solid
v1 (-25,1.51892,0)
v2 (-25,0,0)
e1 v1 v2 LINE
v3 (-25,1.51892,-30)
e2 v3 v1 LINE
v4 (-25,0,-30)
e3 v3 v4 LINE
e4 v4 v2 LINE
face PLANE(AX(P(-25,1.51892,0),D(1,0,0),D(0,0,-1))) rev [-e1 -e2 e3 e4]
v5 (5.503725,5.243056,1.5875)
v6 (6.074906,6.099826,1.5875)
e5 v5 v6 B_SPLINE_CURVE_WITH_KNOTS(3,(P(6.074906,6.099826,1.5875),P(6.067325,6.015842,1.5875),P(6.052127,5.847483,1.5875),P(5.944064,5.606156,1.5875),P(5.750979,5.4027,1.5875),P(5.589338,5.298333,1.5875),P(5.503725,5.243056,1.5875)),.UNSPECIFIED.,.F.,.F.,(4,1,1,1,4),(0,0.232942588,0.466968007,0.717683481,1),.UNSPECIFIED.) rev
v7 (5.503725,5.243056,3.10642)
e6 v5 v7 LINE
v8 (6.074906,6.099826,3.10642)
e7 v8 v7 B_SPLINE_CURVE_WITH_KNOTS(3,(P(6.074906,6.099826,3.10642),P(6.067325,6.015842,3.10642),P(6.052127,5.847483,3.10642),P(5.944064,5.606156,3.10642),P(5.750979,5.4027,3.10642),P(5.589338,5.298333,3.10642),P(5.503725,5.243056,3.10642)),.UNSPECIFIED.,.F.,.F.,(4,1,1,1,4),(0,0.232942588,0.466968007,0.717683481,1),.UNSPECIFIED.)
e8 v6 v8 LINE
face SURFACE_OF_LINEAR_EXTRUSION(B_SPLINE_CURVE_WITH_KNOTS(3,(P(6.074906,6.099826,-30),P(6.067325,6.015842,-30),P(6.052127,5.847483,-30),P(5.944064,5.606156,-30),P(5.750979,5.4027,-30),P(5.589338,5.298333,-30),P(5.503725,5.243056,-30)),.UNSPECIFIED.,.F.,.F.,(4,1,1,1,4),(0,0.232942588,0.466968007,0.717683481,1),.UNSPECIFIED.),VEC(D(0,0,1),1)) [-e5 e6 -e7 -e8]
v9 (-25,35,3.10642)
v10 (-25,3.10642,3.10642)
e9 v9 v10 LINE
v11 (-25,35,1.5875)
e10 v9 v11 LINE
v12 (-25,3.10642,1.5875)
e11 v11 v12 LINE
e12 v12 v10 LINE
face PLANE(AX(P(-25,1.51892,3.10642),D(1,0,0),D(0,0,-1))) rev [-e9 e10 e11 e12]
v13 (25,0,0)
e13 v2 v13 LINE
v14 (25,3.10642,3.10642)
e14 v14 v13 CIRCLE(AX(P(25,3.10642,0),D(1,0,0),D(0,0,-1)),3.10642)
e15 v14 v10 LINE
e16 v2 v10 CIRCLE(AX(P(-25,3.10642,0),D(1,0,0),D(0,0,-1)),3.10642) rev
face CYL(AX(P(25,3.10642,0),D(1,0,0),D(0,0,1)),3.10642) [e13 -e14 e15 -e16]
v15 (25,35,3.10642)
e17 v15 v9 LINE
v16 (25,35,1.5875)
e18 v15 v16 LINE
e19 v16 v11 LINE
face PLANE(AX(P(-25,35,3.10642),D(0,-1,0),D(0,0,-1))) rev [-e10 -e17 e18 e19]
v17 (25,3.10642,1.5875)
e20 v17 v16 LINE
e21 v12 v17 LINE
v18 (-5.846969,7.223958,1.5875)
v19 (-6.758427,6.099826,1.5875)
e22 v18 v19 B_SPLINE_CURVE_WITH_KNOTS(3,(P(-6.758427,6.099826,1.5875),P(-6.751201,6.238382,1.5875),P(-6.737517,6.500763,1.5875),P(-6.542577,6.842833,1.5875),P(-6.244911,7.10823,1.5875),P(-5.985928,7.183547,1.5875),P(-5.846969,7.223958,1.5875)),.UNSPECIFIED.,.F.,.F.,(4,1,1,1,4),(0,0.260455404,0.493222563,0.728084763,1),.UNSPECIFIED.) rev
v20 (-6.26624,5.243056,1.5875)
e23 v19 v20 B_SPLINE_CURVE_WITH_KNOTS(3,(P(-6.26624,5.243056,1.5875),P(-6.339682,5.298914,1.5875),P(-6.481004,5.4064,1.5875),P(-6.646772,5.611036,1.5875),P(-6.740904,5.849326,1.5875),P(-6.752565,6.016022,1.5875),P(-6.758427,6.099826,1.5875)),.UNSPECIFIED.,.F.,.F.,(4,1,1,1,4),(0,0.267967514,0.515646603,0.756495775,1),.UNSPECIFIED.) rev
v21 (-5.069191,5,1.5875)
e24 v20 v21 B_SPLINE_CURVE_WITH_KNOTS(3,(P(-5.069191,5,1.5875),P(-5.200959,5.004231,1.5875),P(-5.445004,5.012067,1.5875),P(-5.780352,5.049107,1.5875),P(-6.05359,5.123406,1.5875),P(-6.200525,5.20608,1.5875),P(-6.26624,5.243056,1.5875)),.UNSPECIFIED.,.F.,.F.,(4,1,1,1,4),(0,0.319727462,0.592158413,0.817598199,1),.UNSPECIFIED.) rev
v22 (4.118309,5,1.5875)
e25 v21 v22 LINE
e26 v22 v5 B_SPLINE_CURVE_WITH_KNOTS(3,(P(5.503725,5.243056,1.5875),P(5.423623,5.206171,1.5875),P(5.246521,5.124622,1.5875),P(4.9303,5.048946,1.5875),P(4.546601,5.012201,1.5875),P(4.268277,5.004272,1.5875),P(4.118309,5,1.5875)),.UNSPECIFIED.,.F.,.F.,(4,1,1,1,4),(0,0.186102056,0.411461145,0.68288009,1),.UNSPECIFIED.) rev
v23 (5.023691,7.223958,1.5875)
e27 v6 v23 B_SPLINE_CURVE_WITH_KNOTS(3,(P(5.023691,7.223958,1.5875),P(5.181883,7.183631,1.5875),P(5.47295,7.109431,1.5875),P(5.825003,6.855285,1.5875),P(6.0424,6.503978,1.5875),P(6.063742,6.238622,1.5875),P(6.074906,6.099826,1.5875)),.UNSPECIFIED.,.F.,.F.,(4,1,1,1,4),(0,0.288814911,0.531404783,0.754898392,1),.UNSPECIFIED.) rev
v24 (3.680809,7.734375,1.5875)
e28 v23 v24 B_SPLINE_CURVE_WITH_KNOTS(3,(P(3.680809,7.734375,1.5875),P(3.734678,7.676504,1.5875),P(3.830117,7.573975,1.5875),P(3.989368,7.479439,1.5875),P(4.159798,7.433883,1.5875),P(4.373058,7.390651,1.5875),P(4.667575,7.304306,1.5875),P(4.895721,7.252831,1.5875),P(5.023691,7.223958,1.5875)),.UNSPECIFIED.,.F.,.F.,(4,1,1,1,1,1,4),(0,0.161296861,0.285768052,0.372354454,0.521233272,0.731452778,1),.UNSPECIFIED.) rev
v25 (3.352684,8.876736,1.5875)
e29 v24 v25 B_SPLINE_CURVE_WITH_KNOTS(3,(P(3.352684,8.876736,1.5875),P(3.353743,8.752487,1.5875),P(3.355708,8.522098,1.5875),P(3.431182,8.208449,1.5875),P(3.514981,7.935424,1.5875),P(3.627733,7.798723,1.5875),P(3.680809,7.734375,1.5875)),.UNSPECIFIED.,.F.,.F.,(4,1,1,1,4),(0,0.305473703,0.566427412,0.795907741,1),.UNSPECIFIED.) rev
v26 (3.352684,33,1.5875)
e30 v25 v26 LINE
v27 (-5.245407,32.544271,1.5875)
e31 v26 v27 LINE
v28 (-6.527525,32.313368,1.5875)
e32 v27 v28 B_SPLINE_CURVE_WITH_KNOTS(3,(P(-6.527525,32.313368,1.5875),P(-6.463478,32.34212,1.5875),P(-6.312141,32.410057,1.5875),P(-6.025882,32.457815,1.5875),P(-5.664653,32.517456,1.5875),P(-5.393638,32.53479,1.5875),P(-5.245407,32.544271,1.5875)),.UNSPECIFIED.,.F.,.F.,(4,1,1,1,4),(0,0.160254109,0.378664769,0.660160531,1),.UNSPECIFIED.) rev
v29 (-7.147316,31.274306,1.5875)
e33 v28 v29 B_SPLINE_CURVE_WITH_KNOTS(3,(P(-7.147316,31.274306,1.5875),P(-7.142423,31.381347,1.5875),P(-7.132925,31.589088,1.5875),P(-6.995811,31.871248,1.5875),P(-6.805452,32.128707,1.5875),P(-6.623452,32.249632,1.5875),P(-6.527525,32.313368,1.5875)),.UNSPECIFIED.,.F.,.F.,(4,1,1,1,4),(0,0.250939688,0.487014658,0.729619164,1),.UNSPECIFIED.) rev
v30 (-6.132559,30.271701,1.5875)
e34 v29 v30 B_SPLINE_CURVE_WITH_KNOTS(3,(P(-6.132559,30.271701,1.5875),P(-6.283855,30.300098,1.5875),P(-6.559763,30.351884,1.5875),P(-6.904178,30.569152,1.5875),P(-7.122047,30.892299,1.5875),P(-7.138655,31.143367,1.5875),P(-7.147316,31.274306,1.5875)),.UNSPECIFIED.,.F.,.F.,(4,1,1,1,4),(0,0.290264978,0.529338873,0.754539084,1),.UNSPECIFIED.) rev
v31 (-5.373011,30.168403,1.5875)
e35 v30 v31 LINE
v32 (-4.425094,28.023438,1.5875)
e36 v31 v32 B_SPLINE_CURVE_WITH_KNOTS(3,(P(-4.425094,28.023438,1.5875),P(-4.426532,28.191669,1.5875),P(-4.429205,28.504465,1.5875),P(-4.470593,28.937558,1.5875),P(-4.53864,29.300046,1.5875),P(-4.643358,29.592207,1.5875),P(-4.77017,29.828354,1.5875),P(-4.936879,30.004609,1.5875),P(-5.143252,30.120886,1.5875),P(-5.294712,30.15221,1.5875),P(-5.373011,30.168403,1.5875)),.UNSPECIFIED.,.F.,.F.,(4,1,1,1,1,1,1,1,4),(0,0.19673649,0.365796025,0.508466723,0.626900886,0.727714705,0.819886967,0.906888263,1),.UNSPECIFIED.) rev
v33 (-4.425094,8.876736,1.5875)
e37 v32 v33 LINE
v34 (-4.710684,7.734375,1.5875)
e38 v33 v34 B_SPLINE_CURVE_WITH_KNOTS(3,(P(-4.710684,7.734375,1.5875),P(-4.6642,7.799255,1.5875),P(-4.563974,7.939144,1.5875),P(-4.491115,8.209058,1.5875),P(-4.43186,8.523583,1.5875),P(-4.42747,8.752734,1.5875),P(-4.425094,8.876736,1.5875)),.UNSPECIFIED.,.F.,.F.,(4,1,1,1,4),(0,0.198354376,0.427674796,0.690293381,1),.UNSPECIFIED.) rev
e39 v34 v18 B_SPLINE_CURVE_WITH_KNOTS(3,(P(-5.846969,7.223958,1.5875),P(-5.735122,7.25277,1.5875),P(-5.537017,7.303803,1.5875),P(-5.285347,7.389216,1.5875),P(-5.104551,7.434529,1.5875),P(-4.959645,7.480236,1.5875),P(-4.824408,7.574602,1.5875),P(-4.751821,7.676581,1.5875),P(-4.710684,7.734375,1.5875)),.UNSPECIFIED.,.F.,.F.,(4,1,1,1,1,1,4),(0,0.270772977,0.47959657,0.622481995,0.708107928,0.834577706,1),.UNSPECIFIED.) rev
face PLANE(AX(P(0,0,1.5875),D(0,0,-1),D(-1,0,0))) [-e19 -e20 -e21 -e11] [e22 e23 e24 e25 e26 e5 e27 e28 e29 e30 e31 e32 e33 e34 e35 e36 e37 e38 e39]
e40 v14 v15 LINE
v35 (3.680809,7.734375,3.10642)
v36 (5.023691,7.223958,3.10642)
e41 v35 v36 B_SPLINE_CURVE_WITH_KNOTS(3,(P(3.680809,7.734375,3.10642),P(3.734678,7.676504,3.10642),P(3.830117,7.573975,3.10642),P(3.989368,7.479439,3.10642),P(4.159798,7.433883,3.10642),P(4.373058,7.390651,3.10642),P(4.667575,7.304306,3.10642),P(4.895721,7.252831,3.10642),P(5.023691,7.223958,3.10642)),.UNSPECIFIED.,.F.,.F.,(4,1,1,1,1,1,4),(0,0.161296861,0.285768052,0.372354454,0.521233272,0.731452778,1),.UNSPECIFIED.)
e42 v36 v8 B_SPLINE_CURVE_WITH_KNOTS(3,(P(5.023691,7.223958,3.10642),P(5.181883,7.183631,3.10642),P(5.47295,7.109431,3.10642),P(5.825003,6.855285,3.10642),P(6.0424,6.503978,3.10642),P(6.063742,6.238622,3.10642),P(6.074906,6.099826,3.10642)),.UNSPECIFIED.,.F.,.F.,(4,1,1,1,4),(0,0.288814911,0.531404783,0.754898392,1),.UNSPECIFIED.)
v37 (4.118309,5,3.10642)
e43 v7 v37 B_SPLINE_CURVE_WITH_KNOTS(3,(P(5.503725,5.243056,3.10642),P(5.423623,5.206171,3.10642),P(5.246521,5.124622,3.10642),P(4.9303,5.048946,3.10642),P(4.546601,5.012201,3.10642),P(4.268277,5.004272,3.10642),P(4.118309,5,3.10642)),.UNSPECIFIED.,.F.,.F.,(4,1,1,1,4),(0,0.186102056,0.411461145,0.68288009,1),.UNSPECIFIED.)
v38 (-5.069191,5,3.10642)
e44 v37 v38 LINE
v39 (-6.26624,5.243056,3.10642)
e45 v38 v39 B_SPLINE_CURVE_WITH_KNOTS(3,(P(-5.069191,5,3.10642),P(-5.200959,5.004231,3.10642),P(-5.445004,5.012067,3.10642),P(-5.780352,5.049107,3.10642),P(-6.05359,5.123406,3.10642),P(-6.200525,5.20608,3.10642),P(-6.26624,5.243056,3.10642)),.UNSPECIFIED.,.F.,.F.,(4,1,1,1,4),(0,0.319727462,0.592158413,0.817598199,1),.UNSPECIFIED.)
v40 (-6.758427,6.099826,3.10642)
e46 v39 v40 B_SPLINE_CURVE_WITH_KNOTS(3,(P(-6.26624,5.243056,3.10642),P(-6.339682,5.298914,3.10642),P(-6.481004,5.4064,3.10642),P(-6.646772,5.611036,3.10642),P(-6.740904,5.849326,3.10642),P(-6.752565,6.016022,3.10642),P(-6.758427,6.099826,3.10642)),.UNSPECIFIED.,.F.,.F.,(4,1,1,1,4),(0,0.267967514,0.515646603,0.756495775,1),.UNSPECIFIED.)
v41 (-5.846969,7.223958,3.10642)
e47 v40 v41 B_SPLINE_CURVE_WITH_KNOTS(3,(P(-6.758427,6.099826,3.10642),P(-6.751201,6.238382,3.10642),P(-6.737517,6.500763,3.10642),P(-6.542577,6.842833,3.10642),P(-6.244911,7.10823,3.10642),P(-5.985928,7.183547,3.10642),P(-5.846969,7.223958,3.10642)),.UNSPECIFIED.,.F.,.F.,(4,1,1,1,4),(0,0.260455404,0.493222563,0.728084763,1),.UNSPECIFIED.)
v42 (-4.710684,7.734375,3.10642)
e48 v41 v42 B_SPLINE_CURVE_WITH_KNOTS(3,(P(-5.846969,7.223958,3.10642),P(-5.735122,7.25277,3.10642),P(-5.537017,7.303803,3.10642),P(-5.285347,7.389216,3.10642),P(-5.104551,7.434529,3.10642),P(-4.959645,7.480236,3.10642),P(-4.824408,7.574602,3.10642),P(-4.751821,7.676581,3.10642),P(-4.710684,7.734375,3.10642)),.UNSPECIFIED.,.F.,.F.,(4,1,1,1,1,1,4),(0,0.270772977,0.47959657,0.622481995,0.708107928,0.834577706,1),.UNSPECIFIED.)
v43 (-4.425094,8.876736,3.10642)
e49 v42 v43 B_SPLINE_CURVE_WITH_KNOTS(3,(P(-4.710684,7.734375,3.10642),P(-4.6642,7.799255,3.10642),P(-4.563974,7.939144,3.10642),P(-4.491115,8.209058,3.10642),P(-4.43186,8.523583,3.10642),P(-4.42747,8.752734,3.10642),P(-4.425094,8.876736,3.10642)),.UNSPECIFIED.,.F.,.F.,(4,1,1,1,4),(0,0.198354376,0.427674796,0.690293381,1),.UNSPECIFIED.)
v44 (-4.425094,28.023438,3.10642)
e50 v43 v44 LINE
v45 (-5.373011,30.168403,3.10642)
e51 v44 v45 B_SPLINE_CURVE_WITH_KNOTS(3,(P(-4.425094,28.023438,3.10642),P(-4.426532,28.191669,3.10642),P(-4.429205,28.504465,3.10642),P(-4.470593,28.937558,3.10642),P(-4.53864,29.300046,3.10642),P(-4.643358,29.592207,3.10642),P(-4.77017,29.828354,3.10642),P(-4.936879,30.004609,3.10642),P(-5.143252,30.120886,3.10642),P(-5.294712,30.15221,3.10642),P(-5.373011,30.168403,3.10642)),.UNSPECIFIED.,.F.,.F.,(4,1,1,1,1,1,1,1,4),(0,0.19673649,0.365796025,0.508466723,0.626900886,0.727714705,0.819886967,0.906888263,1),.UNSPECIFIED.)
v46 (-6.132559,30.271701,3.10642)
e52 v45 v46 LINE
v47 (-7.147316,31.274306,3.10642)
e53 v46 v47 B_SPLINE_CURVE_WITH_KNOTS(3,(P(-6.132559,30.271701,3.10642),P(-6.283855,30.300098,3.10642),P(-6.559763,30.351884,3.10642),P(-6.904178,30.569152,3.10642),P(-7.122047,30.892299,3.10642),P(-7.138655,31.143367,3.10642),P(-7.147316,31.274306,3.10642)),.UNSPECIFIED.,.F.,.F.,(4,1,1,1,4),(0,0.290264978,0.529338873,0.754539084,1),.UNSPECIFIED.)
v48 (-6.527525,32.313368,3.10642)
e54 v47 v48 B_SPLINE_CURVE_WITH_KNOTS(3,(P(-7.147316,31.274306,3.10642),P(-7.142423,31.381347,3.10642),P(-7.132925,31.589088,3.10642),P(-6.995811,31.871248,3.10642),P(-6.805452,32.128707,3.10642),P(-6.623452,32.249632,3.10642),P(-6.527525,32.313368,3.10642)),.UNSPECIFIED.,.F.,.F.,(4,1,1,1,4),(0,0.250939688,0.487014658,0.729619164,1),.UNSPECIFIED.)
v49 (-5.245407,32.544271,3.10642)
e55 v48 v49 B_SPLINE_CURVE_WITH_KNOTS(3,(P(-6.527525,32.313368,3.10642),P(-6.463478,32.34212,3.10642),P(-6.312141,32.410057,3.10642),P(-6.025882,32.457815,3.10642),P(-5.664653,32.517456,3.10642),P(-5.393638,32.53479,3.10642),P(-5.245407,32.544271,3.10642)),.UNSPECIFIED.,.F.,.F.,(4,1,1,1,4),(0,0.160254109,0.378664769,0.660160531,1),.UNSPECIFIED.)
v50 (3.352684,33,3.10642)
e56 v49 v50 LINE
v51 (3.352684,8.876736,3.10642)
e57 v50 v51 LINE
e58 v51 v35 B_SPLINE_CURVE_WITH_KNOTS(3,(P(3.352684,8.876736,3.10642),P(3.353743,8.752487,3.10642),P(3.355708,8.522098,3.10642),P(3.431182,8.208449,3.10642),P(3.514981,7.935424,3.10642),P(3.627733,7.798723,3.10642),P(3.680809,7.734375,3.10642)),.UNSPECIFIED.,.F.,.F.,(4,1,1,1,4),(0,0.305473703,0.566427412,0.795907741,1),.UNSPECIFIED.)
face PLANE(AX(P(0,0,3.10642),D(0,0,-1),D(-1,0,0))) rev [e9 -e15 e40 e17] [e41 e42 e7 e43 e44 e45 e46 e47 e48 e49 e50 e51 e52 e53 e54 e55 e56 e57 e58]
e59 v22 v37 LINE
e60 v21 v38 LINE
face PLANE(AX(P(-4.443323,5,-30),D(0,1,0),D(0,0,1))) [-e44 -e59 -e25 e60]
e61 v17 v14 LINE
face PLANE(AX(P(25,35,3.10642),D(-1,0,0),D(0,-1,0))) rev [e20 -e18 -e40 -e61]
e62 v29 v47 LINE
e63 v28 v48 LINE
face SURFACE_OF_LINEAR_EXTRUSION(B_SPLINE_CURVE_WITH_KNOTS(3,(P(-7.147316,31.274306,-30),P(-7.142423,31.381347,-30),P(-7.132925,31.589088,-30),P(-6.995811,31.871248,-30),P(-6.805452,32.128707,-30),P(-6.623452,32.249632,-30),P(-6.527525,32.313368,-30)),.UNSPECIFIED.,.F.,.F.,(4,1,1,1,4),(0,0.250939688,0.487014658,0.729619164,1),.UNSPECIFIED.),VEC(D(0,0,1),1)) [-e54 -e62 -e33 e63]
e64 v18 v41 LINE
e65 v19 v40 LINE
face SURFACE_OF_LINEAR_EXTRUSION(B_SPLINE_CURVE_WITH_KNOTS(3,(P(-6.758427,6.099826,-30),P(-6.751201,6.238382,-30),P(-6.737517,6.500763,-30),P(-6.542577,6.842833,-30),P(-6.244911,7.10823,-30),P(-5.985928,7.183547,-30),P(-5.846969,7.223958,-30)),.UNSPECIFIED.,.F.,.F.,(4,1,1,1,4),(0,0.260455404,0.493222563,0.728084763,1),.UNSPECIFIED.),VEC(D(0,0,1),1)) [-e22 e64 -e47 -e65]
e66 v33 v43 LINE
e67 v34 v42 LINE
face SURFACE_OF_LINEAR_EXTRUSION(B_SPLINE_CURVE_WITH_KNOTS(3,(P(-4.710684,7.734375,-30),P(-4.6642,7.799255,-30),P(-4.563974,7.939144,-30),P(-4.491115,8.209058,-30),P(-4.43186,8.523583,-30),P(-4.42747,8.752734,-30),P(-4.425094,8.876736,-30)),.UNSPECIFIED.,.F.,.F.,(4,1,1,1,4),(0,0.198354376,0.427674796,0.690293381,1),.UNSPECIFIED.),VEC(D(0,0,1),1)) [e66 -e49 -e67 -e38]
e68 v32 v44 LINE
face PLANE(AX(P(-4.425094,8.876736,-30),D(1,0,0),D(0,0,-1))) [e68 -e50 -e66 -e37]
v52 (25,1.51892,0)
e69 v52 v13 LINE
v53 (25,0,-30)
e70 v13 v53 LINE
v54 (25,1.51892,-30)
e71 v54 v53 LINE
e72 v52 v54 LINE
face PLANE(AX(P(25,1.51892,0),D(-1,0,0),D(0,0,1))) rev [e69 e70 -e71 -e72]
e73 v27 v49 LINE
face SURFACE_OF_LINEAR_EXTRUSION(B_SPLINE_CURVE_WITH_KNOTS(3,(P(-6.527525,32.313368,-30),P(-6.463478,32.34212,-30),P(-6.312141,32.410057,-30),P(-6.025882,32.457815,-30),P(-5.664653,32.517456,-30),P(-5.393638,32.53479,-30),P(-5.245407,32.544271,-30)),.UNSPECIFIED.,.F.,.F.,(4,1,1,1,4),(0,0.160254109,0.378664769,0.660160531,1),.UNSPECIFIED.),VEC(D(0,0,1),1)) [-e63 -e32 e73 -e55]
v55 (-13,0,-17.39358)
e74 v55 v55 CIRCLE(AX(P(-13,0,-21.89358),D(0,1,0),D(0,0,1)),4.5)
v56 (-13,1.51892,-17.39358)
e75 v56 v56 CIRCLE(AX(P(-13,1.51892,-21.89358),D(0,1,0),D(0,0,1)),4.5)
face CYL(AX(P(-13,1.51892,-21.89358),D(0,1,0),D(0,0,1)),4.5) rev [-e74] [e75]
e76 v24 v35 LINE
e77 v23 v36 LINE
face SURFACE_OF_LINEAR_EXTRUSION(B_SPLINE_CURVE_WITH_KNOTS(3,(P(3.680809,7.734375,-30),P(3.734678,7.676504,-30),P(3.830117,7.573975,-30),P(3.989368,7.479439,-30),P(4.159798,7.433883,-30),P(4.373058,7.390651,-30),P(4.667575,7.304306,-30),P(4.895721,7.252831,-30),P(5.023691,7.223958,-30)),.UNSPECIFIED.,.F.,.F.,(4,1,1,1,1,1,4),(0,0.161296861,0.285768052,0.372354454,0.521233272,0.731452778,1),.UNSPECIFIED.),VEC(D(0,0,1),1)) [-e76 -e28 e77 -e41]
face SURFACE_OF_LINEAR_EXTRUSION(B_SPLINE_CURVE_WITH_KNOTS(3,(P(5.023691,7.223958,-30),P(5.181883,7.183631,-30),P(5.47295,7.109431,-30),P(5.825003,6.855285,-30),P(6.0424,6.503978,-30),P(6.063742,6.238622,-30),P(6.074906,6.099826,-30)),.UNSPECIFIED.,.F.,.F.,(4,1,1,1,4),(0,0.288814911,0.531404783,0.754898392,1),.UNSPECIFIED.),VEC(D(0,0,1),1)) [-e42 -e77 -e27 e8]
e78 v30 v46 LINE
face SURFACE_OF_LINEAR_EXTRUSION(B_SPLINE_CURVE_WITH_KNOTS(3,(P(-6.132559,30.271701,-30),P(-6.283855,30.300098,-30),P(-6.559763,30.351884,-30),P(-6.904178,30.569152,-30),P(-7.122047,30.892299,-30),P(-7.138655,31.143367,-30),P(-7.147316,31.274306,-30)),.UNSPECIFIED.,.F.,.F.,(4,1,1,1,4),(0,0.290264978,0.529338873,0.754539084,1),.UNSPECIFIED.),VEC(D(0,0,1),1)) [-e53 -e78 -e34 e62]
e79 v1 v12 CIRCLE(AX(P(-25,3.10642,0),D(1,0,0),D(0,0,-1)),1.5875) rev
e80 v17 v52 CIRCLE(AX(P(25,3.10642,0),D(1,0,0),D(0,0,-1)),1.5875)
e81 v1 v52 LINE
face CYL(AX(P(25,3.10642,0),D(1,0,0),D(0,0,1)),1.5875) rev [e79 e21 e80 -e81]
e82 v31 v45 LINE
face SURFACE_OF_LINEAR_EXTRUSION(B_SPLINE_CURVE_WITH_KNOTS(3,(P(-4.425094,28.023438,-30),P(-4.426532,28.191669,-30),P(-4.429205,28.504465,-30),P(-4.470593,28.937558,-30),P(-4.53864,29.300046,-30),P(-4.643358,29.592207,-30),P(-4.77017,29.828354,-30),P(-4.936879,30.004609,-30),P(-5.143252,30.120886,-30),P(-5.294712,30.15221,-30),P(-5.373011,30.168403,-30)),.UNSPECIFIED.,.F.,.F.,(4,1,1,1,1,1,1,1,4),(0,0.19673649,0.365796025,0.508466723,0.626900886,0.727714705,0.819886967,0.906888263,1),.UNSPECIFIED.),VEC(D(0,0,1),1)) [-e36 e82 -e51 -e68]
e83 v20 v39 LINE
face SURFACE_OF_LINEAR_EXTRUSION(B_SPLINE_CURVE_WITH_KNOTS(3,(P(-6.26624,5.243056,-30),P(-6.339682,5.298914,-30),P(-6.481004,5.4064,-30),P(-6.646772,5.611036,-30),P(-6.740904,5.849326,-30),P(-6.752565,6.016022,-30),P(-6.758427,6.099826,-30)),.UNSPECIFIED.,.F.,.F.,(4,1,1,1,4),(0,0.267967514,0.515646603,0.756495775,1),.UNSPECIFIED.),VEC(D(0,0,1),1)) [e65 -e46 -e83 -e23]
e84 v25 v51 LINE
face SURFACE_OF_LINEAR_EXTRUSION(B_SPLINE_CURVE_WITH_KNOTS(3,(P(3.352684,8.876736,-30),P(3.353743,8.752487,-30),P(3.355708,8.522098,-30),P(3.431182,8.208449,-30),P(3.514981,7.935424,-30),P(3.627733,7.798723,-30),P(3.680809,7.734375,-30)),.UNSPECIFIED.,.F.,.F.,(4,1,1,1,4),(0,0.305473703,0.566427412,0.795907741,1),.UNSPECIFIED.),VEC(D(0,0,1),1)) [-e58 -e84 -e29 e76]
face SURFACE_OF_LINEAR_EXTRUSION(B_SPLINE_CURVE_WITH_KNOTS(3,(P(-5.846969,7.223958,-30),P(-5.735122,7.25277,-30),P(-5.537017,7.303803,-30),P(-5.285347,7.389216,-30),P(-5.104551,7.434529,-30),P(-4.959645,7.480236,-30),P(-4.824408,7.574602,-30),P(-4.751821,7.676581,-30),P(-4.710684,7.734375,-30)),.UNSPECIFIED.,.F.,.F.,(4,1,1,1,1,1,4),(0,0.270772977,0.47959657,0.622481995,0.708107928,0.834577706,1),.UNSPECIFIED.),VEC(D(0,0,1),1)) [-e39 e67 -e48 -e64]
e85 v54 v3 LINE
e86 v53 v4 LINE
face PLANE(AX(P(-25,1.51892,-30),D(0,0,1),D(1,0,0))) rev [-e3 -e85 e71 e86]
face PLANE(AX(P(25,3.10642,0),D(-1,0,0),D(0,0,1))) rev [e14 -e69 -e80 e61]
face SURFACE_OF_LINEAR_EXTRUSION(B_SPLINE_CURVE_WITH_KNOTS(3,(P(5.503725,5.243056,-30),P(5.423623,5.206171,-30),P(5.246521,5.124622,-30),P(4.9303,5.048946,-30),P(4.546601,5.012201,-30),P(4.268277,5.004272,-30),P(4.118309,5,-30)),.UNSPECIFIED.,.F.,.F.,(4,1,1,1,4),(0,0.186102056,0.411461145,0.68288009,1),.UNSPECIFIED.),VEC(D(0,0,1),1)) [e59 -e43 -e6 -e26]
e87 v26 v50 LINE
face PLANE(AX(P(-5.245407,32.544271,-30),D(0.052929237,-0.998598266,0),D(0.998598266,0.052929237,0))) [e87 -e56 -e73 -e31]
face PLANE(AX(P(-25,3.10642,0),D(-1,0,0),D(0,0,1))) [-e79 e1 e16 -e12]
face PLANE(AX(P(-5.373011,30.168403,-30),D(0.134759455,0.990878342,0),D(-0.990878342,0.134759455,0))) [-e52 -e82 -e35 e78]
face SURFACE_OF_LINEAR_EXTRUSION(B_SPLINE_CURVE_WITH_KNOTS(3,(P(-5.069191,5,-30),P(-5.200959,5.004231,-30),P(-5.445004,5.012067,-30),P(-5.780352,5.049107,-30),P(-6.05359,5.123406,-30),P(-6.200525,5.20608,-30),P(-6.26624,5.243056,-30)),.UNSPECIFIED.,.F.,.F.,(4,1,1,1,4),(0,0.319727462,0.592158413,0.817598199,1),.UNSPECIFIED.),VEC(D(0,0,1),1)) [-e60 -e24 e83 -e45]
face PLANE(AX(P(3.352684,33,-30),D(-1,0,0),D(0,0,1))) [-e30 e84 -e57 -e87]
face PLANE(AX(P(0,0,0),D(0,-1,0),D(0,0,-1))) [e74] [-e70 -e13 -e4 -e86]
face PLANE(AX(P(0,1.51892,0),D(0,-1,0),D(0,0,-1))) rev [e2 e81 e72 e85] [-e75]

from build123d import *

# Parameters (mm, degrees)
SKETCH1_W            = 50
SKETCH1_H            = 30
BASE_FLANGE1_DEPTH   = 1.51892
EDGE_FLANGE1_DEPTH   = 50
M8_CLEARANCE_HOLE1_D = 9
CUT_EXTRUDE1_DEPTH   = 55.277389816


# Sheet-metal steps are written as plain solids
with BuildPart() as part:
    # Sketch1 → Base-Flange1 (new body)
    with BuildSketch(Plane(origin=(0, 0, 0), x_dir=(1, 0, 0), z_dir=(0, 1, 0))):
        with Locations((0, 15)):
            Rectangle(SKETCH1_W, SKETCH1_H)
    extrude(amount=BASE_FLANGE1_DEPTH)

    # Edge-Flange1 section (across the edge) → Edge-Flange1 (add)
    with BuildSketch(Plane(origin=(-25, 1.51892, 1.5875), x_dir=(0, 0, -1), z_dir=(1, 0, 0))):
        with BuildLine():
            Line((-1.51892, 1.5875), (-1.51892, 33.48108))
            Line((-1.51892, 33.48108), (0, 33.48108))
            Line((0, 33.48108), (0, 1.5875))
            ThreePointArc((0, 1.5875), (0.464967985, 0.464967985), (1.5875, 0))
            Line((1.5875, 0), (1.5875, -1.51892))
            ThreePointArc((1.5875, -1.51892), (-0.609070647, -0.609070647), (-1.51892, 1.5875))
        make_face()
    extrude(amount=EDGE_FLANGE1_DEPTH)

    # M8 Clearance Hole1 (through all)
    with Locations(Plane(origin=(0, 1.51892, 0), x_dir=(1, 0, 0), z_dir=(0, 1, 0))):
        with Locations((-13, 21.89358)):
            Hole(M8_CLEARANCE_HOLE1_D / 2)

    # Sketch11 → Cut-Extrude1 (cut, through all)
    with BuildSketch(Plane.XY.offset(3.10642)):
        with BuildLine():
            Line((3.352683653, 33), (3.352683653, 8.876736111))
            add(Edge.make_bspline(
                [(3.352683653, 8.876736111), (3.353743072, 8.75248746), (3.355707508, 8.522098259), (3.431182496, 8.208449128), (3.514980812, 7.935424237), (3.62773347, 7.798723212), (3.680808653, 7.734375)],
                knots=[0, 0, 0, 0, 1.221894812, 2.265709648, 3.183630964, 4, 4, 4, 4], degree=3))
            add(Edge.make_bspline(
                [(3.680808653, 7.734375), (3.734677776, 7.676504164), (3.830117167, 7.573974975), (3.989367782, 7.479439012), (4.159797664, 7.433882679), (4.373058128, 7.390651398), (4.667575389, 7.304305676), (4.895720619, 7.252831146), (5.023690598, 7.223958333)],
                knots=[0, 0, 0, 0, 0.967781164, 1.714608312, 2.234126727, 3.127399629, 4.388716669, 6, 6, 6, 6], degree=3))
            add(Edge.make_bspline(
                [(5.023690598, 7.223958333), (5.181883466, 7.183631094), (5.472950316, 7.109431018), (5.825003123, 6.855284919), (6.042399674, 6.503977916), (6.06374242, 6.238622284), (6.074905875, 6.099826389)],
                knots=[0, 0, 0, 0, 1.155259645, 2.125619132, 3.019593567, 4, 4, 4, 4], degree=3))
            add(Edge.make_bspline(
                [(6.074905875, 6.099826389), (6.06732471, 6.015842007), (6.052127137, 5.847482842), (5.944064224, 5.60615586), (5.75097894, 5.402699673), (5.589337522, 5.298332742), (5.50372532, 5.243055556)],
                knots=[0, 0, 0, 0, 0.931770353, 1.867872026, 2.870733925, 4, 4, 4, 4], degree=3))
            add(Edge.make_bspline(
                [(5.50372532, 5.243055556), (5.423622762, 5.206171118), (5.246520526, 5.124621709), (4.930300382, 5.048945746), (4.546600649, 5.012201245), (4.268276747, 5.004272313), (4.118308653, 5)],
                knots=[0, 0, 0, 0, 0.744408225, 1.645844579, 2.731520362, 4, 4, 4, 4], degree=3))
            Line((4.118308653, 5), (3.37091282, 5))
            Line((3.37091282, 5), (-4.443323291, 5))
            Line((-4.443323291, 5), (-5.069191347, 5))
            add(Edge.make_bspline(
                [(-5.069191347, 5), (-5.200959456, 5.004230902), (-5.445003537, 5.012066838), (-5.780351524, 5.049107042), (-6.053589539, 5.123405658), (-6.200525, 5.206080373), (-6.266239958, 5.243055556)],
                knots=[0, 0, 0, 0, 1.278909849, 2.36863365, 3.270392795, 4, 4, 4, 4], degree=3))
            add(Edge.make_bspline(
                [(-6.266239958, 5.243055556), (-6.339681587, 5.298913512), (-6.481004414, 5.406400292), (-6.646771526, 5.611036077), (-6.740904198, 5.849325914), (-6.752565064, 6.016021642), (-6.758427458, 6.099826389)],
                knots=[0, 0, 0, 0, 1.071870055, 2.062586414, 3.025983099, 4, 4, 4, 4], degree=3))
            add(Edge.make_bspline(
                [(-6.758427458, 6.099826389), (-6.751201394, 6.238381888), (-6.737517447, 6.500763459), (-6.542576602, 6.842832855), (-6.244911058, 7.108230032), (-5.985928279, 7.183546642), (-5.846969125, 7.223958333)],
                knots=[0, 0, 0, 0, 1.041821617, 1.972890251, 2.912339053, 4, 4, 4, 4], degree=3))
            add(Edge.make_bspline(
                [(-5.846969125, 7.223958333), (-5.735122036, 7.252770415), (-5.537017037, 7.303802744), (-5.285346725, 7.389215809), (-5.104551332, 7.434528827), (-4.959644822, 7.480235759), (-4.824408418, 7.574602156), (-4.751821285, 7.676581079), (-4.710684402, 7.734375)],
                knots=[0, 0, 0, 0, 1.624637859, 2.877579422, 3.734891967, 4.248647568, 5.007466236, 6, 6, 6, 6], degree=3))
            add(Edge.make_bspline(
                [(-4.710684402, 7.734375), (-4.664199883, 7.799255117), (-4.563973926, 7.939144093), (-4.49111496, 8.20905769), (-4.431859524, 8.523582896), (-4.42746965, 8.752733909), (-4.425094125, 8.876736111)],
                knots=[0, 0, 0, 0, 0.793417505, 1.710699182, 2.761173524, 4, 4, 4, 4], degree=3))
            Line((-4.425094125, 8.876736111), (-4.425094125, 28.0234375))
            add(Edge.make_bspline(
                [(-4.425094125, 28.0234375), (-4.426531902, 28.191669086), (-4.429205189, 28.504465382), (-4.470592994, 28.937557572), (-4.538640115, 29.30004587), (-4.643358024, 29.592207067), (-4.770170391, 29.828354389), (-4.936878879, 30.004608948), (-5.143251784, 30.120886097), (-5.294711667, 30.152209661), (-5.373010791, 30.168402778)],
                knots=[0, 0, 0, 0, 1.573891919, 2.926368201, 4.067733782, 5.015207088, 5.82171764, 6.559095732, 7.255106106, 8, 8, 8, 8], degree=3))
            Line((-5.373010791, 30.168402778), (-6.132559402, 30.271701389))
            add(Edge.make_bspline(
                [(-6.132559402, 30.271701389), (-6.283854904, 30.300098434), (-6.559763459, 30.351884427), (-6.904178309, 30.569151507), (-7.122046768, 30.892299153), (-7.138654843, 31.143367481), (-7.147316347, 31.274305556)],
                knots=[0, 0, 0, 0, 1.161059911, 2.117355492, 3.018156337, 4, 4, 4, 4], degree=3))
            add(Edge.make_bspline(
                [(-7.147316347, 31.274305556), (-7.142422565, 31.381346659), (-7.132924891, 31.589088155), (-6.995811409, 31.871248407), (-6.805451884, 32.128706889), (-6.623451964, 32.249631783), (-6.52752468, 32.313368056)],
                knots=[0, 0, 0, 0, 1.003758752, 1.948058634, 2.918476655, 4, 4, 4, 4], degree=3))
            add(Edge.make_bspline(
                [(-6.52752468, 32.313368056), (-6.463477626, 32.342119574), (-6.312140707, 32.410056597), (-6.025881505, 32.457814765), (-5.664653043, 32.51745606), (-5.393638242, 32.534790019), (-5.245406625, 32.544270833)],
                knots=[0, 0, 0, 0, 0.641016437, 1.514659076, 2.640642126, 4, 4, 4, 4], degree=3))
            Line((-5.245406625, 32.544270833), (3.352683653, 33))
        make_face()
    extrude(amount=-CUT_EXTRUDE1_DEPTH, mode=Mode.SUBTRACT)


solid = part.part
